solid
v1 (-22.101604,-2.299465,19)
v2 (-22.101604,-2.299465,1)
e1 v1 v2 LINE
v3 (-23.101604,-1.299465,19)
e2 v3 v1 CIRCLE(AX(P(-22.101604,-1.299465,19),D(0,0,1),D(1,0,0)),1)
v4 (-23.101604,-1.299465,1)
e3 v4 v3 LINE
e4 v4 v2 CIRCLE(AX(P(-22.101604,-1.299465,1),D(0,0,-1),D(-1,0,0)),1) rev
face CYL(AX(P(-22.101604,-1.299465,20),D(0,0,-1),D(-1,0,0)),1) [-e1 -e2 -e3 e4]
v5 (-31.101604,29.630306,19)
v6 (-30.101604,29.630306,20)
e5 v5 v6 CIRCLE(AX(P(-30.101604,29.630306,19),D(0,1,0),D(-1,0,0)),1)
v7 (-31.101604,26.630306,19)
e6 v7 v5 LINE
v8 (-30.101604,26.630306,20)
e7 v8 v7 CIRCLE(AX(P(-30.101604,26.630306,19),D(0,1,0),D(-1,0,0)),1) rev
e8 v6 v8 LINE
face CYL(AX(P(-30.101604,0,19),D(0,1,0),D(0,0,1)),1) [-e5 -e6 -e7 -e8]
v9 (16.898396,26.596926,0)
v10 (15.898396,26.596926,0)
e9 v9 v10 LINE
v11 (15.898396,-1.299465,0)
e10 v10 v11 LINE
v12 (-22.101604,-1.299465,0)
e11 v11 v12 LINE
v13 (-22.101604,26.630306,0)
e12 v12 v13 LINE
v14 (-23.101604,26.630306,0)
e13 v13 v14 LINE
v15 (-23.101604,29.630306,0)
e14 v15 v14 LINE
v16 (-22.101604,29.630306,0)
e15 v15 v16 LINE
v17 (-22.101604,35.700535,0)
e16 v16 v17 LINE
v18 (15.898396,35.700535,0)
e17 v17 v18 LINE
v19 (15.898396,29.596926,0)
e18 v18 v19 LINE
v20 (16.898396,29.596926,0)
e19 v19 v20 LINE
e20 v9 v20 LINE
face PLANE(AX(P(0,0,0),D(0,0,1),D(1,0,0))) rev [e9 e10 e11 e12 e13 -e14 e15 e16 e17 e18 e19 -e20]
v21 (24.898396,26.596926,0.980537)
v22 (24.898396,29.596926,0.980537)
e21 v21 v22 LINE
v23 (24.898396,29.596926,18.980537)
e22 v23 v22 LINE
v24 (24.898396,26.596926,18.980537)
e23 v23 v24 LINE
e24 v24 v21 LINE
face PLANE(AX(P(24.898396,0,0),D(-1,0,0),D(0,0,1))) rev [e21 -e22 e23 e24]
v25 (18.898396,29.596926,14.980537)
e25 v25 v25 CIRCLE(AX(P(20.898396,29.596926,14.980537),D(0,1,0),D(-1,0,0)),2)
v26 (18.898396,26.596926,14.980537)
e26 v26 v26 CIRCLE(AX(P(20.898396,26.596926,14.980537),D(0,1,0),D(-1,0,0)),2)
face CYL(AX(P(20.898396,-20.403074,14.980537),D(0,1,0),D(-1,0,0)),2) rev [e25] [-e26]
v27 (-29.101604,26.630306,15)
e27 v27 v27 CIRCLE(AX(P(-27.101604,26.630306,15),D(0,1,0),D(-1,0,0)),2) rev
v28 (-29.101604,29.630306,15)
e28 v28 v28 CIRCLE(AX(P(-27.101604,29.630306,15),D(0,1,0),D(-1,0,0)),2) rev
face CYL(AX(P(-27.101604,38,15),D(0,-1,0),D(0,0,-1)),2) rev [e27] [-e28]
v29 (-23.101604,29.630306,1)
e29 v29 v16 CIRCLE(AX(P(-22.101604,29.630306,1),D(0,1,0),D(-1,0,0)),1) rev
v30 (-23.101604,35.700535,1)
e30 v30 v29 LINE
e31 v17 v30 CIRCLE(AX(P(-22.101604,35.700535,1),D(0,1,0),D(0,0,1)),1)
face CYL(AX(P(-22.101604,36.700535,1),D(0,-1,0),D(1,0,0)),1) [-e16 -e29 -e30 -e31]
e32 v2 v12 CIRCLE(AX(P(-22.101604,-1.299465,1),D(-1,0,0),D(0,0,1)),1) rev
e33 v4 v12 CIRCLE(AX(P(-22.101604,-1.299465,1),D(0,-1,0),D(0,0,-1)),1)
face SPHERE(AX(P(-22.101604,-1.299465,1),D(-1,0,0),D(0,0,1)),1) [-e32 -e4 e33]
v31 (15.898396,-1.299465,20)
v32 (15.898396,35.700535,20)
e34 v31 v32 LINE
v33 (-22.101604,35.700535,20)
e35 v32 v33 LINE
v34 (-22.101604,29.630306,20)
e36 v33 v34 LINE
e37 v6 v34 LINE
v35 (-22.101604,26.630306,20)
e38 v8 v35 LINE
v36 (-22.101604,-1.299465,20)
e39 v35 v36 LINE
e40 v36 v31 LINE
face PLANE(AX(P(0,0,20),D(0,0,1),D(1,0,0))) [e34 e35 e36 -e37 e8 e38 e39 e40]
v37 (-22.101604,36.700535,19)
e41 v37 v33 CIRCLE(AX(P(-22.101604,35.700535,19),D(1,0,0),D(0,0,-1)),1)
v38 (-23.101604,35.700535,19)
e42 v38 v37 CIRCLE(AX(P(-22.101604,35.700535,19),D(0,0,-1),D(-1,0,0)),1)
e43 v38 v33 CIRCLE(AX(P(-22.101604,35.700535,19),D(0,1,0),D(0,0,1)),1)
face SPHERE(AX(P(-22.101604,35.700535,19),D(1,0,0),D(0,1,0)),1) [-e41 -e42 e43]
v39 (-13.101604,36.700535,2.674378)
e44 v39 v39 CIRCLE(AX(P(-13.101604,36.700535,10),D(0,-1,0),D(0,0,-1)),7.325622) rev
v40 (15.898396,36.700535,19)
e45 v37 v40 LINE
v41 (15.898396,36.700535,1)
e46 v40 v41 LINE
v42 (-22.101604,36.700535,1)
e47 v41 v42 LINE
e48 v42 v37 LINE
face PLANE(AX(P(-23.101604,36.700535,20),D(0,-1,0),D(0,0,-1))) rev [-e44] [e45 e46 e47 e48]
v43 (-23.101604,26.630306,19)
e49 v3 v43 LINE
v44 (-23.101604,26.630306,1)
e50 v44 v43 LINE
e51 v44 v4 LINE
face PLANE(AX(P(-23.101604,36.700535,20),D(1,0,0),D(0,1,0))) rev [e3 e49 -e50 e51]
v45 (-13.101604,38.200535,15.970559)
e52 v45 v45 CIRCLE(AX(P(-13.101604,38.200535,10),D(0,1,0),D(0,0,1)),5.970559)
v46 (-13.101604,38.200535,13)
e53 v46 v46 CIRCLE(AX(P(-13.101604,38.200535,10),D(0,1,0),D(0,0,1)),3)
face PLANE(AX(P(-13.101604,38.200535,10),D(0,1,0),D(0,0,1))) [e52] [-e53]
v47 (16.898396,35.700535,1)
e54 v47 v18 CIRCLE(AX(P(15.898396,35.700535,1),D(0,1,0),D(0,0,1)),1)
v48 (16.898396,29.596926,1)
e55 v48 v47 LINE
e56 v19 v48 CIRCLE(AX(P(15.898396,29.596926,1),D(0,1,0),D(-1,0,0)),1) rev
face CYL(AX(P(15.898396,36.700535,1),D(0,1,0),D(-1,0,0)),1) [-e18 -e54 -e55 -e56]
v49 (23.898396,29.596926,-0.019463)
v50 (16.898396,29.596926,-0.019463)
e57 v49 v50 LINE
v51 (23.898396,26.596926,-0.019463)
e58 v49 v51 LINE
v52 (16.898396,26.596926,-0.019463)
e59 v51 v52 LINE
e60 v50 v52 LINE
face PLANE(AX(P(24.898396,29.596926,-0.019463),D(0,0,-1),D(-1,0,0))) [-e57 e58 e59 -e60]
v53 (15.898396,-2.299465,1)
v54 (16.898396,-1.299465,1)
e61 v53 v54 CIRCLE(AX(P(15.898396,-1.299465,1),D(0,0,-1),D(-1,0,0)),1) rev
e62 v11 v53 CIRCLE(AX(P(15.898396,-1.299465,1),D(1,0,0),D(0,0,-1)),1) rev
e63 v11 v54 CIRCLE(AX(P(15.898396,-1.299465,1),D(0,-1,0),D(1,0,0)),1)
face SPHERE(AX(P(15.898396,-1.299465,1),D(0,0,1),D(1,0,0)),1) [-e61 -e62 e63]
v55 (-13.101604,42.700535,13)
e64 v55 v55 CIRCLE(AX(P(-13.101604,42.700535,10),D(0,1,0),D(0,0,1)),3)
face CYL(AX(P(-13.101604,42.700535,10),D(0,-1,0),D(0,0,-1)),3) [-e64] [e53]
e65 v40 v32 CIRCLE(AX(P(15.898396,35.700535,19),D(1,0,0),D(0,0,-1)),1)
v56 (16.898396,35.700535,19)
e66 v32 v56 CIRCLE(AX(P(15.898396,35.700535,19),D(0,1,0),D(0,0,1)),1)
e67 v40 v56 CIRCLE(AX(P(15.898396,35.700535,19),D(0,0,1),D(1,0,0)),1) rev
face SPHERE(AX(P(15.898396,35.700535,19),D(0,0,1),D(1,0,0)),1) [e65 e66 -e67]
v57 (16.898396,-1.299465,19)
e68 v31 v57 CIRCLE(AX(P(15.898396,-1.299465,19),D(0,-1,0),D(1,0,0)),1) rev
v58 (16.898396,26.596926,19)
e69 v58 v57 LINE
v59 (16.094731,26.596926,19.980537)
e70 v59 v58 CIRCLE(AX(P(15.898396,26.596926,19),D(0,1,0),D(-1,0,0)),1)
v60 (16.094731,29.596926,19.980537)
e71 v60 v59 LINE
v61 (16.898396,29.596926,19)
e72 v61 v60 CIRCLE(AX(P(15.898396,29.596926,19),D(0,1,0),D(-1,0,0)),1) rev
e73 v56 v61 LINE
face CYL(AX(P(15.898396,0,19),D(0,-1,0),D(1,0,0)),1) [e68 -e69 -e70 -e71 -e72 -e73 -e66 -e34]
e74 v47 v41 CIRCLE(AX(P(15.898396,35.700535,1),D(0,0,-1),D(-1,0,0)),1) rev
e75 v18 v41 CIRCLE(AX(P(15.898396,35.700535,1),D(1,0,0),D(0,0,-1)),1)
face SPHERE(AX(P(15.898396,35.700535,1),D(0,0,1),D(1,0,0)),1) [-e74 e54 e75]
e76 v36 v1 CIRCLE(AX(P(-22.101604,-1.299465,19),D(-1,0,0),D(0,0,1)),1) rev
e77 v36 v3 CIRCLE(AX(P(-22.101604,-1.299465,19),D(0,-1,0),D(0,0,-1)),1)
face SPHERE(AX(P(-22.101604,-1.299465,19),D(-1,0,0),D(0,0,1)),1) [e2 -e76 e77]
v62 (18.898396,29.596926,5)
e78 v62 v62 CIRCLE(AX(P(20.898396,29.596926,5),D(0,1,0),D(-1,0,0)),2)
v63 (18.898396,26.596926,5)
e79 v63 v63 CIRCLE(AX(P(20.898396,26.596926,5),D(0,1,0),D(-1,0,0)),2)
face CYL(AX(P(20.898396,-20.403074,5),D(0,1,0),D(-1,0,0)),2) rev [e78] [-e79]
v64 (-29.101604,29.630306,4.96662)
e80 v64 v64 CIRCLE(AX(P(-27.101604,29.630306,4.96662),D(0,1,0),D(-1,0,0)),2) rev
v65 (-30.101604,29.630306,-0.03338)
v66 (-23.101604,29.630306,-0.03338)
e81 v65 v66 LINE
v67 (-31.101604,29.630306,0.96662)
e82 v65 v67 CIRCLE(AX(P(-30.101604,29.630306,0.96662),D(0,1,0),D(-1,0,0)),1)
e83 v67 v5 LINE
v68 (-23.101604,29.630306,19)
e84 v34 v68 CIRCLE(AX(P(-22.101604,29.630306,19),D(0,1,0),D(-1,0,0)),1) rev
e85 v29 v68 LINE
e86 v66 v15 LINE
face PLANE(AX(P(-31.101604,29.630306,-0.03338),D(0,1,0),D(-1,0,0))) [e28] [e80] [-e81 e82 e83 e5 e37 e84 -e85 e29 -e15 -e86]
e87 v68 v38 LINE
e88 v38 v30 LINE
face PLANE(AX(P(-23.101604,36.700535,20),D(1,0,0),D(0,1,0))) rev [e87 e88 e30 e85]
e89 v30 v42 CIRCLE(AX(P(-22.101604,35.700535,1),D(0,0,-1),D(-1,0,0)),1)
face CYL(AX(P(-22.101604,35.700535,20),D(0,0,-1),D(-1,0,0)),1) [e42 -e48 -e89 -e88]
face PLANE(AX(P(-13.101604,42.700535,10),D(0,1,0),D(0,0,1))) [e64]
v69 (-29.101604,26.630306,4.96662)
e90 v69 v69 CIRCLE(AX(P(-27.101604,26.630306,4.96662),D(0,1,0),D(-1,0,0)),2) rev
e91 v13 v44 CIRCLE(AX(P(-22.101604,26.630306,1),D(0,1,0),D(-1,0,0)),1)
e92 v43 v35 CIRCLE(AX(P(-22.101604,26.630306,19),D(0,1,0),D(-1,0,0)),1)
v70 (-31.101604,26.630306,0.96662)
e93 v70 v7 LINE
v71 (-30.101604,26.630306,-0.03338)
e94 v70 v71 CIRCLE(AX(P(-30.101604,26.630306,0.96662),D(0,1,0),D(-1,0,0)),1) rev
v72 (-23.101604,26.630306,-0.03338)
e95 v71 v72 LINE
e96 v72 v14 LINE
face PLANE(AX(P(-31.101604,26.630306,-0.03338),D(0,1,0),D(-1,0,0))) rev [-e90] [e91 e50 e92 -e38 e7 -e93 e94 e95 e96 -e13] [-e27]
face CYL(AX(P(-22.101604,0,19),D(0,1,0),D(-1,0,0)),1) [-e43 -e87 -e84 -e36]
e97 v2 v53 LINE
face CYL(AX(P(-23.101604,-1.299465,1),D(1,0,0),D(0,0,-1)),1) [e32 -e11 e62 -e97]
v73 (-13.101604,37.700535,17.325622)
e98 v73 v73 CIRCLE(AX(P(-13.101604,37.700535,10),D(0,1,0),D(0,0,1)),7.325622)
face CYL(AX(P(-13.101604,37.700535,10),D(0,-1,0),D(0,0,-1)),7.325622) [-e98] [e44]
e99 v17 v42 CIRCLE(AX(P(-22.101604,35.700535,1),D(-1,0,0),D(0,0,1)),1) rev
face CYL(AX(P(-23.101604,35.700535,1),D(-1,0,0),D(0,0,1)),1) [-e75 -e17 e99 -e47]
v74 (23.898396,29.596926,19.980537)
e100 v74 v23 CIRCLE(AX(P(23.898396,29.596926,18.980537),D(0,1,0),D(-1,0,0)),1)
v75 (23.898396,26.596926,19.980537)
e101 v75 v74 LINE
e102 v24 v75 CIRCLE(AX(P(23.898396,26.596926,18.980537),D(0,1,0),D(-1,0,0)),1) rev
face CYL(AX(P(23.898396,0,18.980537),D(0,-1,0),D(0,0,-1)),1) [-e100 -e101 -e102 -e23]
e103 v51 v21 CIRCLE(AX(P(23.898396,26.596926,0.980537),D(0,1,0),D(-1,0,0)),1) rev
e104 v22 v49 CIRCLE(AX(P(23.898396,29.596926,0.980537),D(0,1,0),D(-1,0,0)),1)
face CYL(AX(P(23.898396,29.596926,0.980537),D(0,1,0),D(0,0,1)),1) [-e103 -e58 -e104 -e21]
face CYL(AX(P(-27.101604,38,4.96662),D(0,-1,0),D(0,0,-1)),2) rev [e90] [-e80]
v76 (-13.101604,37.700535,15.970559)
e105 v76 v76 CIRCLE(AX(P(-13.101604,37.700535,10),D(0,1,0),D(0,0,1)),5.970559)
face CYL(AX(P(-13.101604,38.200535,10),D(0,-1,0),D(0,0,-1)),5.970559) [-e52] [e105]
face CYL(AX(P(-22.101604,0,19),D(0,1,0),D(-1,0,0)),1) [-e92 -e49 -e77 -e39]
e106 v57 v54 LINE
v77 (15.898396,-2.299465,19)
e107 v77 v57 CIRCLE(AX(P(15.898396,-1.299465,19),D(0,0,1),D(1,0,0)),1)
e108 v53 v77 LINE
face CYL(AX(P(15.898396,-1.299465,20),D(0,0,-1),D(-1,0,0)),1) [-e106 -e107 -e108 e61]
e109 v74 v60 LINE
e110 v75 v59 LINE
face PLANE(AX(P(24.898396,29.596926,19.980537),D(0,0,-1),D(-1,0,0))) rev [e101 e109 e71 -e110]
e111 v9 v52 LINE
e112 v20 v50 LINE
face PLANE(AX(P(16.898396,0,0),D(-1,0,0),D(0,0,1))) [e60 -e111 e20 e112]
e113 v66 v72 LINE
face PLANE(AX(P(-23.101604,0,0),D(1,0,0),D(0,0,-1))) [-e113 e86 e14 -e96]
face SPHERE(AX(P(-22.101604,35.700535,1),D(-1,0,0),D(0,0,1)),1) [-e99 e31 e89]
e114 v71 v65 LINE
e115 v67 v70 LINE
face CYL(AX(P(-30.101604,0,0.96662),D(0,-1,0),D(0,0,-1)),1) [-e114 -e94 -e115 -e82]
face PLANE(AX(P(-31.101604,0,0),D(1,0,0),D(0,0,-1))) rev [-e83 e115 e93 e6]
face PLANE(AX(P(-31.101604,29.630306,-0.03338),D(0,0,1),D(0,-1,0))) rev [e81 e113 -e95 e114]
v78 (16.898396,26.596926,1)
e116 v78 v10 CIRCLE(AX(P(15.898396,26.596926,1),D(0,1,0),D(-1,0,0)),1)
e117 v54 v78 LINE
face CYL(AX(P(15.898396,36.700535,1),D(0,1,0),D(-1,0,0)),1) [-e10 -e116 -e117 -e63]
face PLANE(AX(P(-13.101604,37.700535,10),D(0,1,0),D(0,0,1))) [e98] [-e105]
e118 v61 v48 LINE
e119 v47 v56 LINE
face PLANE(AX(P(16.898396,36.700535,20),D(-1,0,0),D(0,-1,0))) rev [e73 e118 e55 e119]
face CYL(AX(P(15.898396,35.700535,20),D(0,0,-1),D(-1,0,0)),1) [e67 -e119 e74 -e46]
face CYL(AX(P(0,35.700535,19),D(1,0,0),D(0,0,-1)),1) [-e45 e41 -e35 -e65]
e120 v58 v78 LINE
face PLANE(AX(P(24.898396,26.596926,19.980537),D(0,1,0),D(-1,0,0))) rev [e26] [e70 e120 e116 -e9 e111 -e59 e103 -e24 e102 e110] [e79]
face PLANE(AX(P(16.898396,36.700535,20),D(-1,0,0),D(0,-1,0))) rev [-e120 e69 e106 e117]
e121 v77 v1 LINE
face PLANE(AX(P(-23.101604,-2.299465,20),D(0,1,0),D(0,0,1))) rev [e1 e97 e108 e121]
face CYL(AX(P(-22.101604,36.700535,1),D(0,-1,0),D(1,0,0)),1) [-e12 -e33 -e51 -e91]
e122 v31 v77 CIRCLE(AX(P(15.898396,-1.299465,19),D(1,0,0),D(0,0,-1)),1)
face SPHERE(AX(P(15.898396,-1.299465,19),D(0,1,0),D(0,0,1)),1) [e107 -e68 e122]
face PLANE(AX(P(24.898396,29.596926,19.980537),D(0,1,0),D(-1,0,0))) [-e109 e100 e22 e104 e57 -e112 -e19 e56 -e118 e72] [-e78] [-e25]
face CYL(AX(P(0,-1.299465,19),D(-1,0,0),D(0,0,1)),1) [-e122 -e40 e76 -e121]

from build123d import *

# Parameters (mm, degrees)
SKETCH_1_W               = 40
SKETCH_1_H               = 39
EXTRUDE_1_DEPTH          = 20
SKETCH_3_W               = 20
SKETCH_3_H               = 3
EXTRUDE_2_DEPTH          = 8
SKETCH_6_W               = 20.033379722
SKETCH_6_H               = 3
EXTRUDE_4_DEPTH          = 8
CUT_EXTRUDE_1_DEPTH      = 38
CUT_EXTRUDE_1_DEPTH_BACK = 50
SKETCH_7_R               = 2
SKETCH_8_R               = 2
CUT_EXTRUDE_2_DEPTH      = 50
SKETCH_9_R               = 3
EXTRUDE_7_DEPTH          = 6
SKETCH_11_R              = 5.970559472
EXTRUDE_8_DEPTH          = 1.5
SKETCH_12_R              = 7.325621725
EXTRUDE_9_DEPTH          = 1
FILLET_3_R               = 1
FILLET_4_R               = 1
FILLET_5_R               = 1
FILLET_8_R               = 1
FILLET_9_R               = 1


with BuildPart() as part:
    # 草图1 → 凸台-拉伸1 (new body)
    with BuildSketch(Plane.XY):
        with Locations((-3.101604278, 17.200534759)):
            Rectangle(SKETCH_1_W, SKETCH_1_H)
    extrude(amount=EXTRUDE_1_DEPTH)

    # 草图3 → 凸台-拉伸2 (add)
    with BuildSketch(Plane(origin=(16.898395722, 0, 0), x_dir=(0, 0, -1), z_dir=(1, 0, 0))):
        with Locations((-9.980536854, 28.09692648)):
            Rectangle(SKETCH_3_W, SKETCH_3_H)
    extrude(amount=EXTRUDE_2_DEPTH)

    # 草图6 → 凸台-拉伸4 (add)
    with BuildSketch(Plane.ZY.offset(23.101604278)):
        with Locations((9.983310139, 28.130306202)):
            Rectangle(SKETCH_6_W, SKETCH_6_H)
    extrude(amount=EXTRUDE_4_DEPTH)

    # 草图7 → 切除-拉伸1 (cut, two sides: drawn at the far end of the back side and taken through both)
    with BuildSketch(Plane(origin=(0, 0, 0), x_dir=(1, 0, 0), z_dir=(0, 1, 0)).offset(-CUT_EXTRUDE_1_DEPTH_BACK)):
        with Locations(Location((-27.101604278, -15, 0), (0, 0, 180))):
            Circle(SKETCH_7_R)
        with Locations(Location((-27.101604278, -4.966620278, 0), (0, 0, 180))):
            Circle(SKETCH_7_R)
    extrude(amount=CUT_EXTRUDE_1_DEPTH + CUT_EXTRUDE_1_DEPTH_BACK, mode=Mode.SUBTRACT)

    # 草图8 → 切除-拉伸2 (cut)
    with BuildSketch(Plane(origin=(0, 29.59692648, 0), x_dir=(1, 0, 0), z_dir=(0, 1, 0))):
        with Locations(Location((20.898395722, -5, 0), (0, 0, 180))):
            Circle(SKETCH_8_R)
        with Locations(Location((20.898395722, -14.980536854, 0), (0, 0, 180))):
            Circle(SKETCH_8_R)
    extrude(amount=-CUT_EXTRUDE_2_DEPTH, mode=Mode.SUBTRACT)

    # 草图9 → 凸台-拉伸7 (add)
    with BuildSketch(Plane(origin=(0, 36.700534759, 0), x_dir=(1, 0, 0), z_dir=(0, 1, 0))):
        with Locations(Location((-13.101604278, -10, 0), (0, 0, 90))):
            Circle(SKETCH_9_R)
    extrude(amount=EXTRUDE_7_DEPTH)

    # 草图11 → 凸台-拉伸8 (add)
    with BuildSketch(Plane(origin=(0, 36.700534759, 0), x_dir=(1, 0, 0), z_dir=(0, 1, 0))):
        with Locations(Location((-13.101604278, -10, 0), (0, 0, 90))):
            Circle(SKETCH_11_R)
    extrude(amount=EXTRUDE_8_DEPTH)

    # 草图12 → 凸台-拉伸9 (add)
    with BuildSketch(Plane(origin=(0, 36.700534759, 0), x_dir=(1, 0, 0), z_dir=(0, 1, 0))):
        with Locations(Location((-13.101604278, -10, 0), (0, 0, 90))):
            Circle(SKETCH_12_R)
    extrude(amount=EXTRUDE_9_DEPTH)

    # 圆角3
    # the kernel refuses this fillet: 1 mm, written as the material it takes off along each edge
    with BuildSketch(Plane(origin=(15.898395722, 35.700534759, 19), x_dir=(0, 0, 1), z_dir=(0, 1, 0))) as fillet_3_piece_1_section:
        Polygon((0, 0), (FILLET_3_R, 0), (FILLET_3_R, FILLET_3_R), (0, FILLET_3_R), align=None)
    fillet_3_piece_1 = extrude(amount=FILLET_3_R, mode=Mode.PRIVATE)
    fillet_3_piece_1 = fillet_3_piece_1 - Plane(origin=(15.898395722, 35.700534759, 19), x_dir=(-0.7071067811865475, 0, -0.7071067811865475), z_dir=(0, 1, 0)) * Sphere(FILLET_3_R, mode=Mode.PRIVATE)
    add(fillet_3_piece_1, mode=Mode.SUBTRACT)
    with BuildSketch(Plane(origin=(16.898395722, 36.700534759, -2.5), x_dir=(-1, 0, 0), z_dir=(0, 0, 1))) as fillet_3_piece_2:
        with BuildLine():
            CenterArc((FILLET_3_R, FILLET_3_R), FILLET_3_R, 180, 90)
            Line((0, FILLET_3_R), (0, 0))
            Line((0, 0), (FILLET_3_R, 0))
        make_face()
    extrude(amount=21.5, mode=Mode.SUBTRACT)
    with BuildSketch(Plane(origin=(16.898395722, 35.700534759, 20), x_dir=(-1, 0, 0), z_dir=(0, -1, 0))) as fillet_3_piece_3_section:
        with BuildLine():
            CenterArc((FILLET_3_R, FILLET_3_R), FILLET_3_R, 180, 90)
            Line((0, FILLET_3_R), (0, 0))
            Line((0, 0), (FILLET_3_R, 0))
        make_face()
    fillet_3_piece_3 = extrude(amount=40.5, mode=Mode.PRIVATE)
    fillet_3_piece_3 = split(fillet_3_piece_3, bisect_by=Plane(origin=(16.437934638, 29.59692648, 20.00107683), z_dir=(0, 1, 0)), keep=Keep.TOP, mode=Mode.PRIVATE)
    fillet_3_piece_3 = split(fillet_3_piece_3, bisect_by=Plane(origin=(16.437934638, 32.648730619, 19.980536854), z_dir=(0, 0, 1)), keep=Keep.TOP, mode=Mode.PRIVATE)
    add(fillet_3_piece_3, mode=Mode.SUBTRACT)
    with BuildSketch(Plane(origin=(16.898395722, 35.700534759, 20), x_dir=(-1, 0, 0), z_dir=(0, -1, 0))) as fillet_3_piece_4_section:
        with BuildLine():
            CenterArc((FILLET_3_R, FILLET_3_R), FILLET_3_R, 180, 90)
            Line((0, FILLET_3_R), (0, 0))
            Line((0, 0), (FILLET_3_R, 0))
        make_face()
    fillet_3_piece_4 = extrude(amount=40.5, mode=Mode.PRIVATE)
    fillet_3_piece_4 = split(fillet_3_piece_4, bisect_by=Plane(origin=(16.712608884, 29.59692648, 19.734140611), z_dir=(0, 1, 0)), keep=Keep.TOP, mode=Mode.PRIVATE)
    fillet_3_piece_4 = split(fillet_3_piece_4, bisect_by=Plane(origin=(16.712608884, 32.648730619, 19.980536854), z_dir=(0, 0, -1)), keep=Keep.TOP, mode=Mode.PRIVATE)
    add(fillet_3_piece_4, mode=Mode.SUBTRACT)
    with BuildSketch(Plane(origin=(16.898395722, 35.700534759, 20), x_dir=(-1, 0, 0), z_dir=(0, -1, 0))) as fillet_3_piece_5_section:
        with BuildLine():
            CenterArc((FILLET_3_R, FILLET_3_R), FILLET_3_R, 180, 90)
            Line((0, FILLET_3_R), (0, 0))
            Line((0, 0), (FILLET_3_R, 0))
        make_face()
    fillet_3_piece_5 = extrude(amount=40.5, mode=Mode.PRIVATE)
    fillet_3_piece_5 = split(fillet_3_piece_5, bisect_by=Plane(origin=(16.437934638, 29.59692648, 20.00107683), z_dir=(0, -1, 0)), keep=Keep.TOP, mode=Mode.PRIVATE)
    fillet_3_piece_5 = split(fillet_3_piece_5, bisect_by=Plane(origin=(16.437934638, 28.09692648, 19.980536854), z_dir=(0, 0, 1)), keep=Keep.TOP, mode=Mode.PRIVATE)
    fillet_3_piece_5 = split(fillet_3_piece_5, bisect_by=Plane(origin=(16.437934638, 26.59692648, 20.00107683), z_dir=(0, 1, 0)), keep=Keep.TOP, mode=Mode.PRIVATE)
    add(fillet_3_piece_5, mode=Mode.SUBTRACT)
    with BuildSketch(Plane(origin=(16.898395722, 35.700534759, 20), x_dir=(-1, 0, 0), z_dir=(0, -1, 0))) as fillet_3_piece_6_section:
        with BuildLine():
            CenterArc((FILLET_3_R, FILLET_3_R), FILLET_3_R, 180, 90)
            Line((0, FILLET_3_R), (0, 0))
            Line((0, 0), (FILLET_3_R, 0))
        make_face()
    fillet_3_piece_6 = extrude(amount=40.5, mode=Mode.PRIVATE)
    fillet_3_piece_6 = split(fillet_3_piece_6, bisect_by=Plane(origin=(16.437934638, 10.898730619, 19.980536854), z_dir=(0, 0, 1)), keep=Keep.TOP, mode=Mode.PRIVATE)
    fillet_3_piece_6 = split(fillet_3_piece_6, bisect_by=Plane(origin=(16.437934638, 26.59692648, 20.00107683), z_dir=(0, -1, 0)), keep=Keep.TOP, mode=Mode.PRIVATE)
    add(fillet_3_piece_6, mode=Mode.SUBTRACT)
    with BuildSketch(Plane(origin=(16.898395722, 35.700534759, 20), x_dir=(-1, 0, 0), z_dir=(0, -1, 0))) as fillet_3_piece_7_section:
        with BuildLine():
            CenterArc((FILLET_3_R, FILLET_3_R), FILLET_3_R, 180, 90)
            Line((0, FILLET_3_R), (0, 0))
            Line((0, 0), (FILLET_3_R, 0))
        make_face()
    fillet_3_piece_7 = extrude(amount=40.5, mode=Mode.PRIVATE)
    fillet_3_piece_7 = split(fillet_3_piece_7, bisect_by=Plane(origin=(16.712608884, 10.898730619, 19.980536854), z_dir=(0, 0, -1)), keep=Keep.TOP, mode=Mode.PRIVATE)
    fillet_3_piece_7 = split(fillet_3_piece_7, bisect_by=Plane(origin=(16.712608884, 26.59692648, 19.734140611), z_dir=(0, -1, 0)), keep=Keep.TOP, mode=Mode.PRIVATE)
    add(fillet_3_piece_7, mode=Mode.SUBTRACT)
    with BuildSketch(Plane(origin=(-25.601604278, 36.700534759, 20), x_dir=(0, 0, -1), z_dir=(1, 0, 0))) as fillet_3_piece_8:
        with BuildLine():
            CenterArc((FILLET_3_R, -FILLET_3_R), FILLET_3_R, 90, 90)
            Line((0, -FILLET_3_R), (0, 0))
            Line((0, 0), (FILLET_3_R, 0))
        make_face()
    extrude(amount=41.5, mode=Mode.SUBTRACT)

    # 圆角4
    fillet_4_edges = [part.edges().sort_by_distance(p)[0] for p in [
        (-23.101604278, 12.16542048, 0),
        (-23.101604278, 12.16542048, 20),
        (-3.101604278, -2.299465241, 0),
        (-23.101604278, -2.299465241, 10),
        (-3.601604278, -2.299465241, 20),
        (16.898395722, -2.299465241, 9.5),
        (16.605502503, -2.299465241, 19.707106781),
    ]]
    fillet(fillet_4_edges, radius=FILLET_4_R)

    # 圆角5
    # the kernel refuses this fillet: 1 mm, written as the material it takes off along each edge
    with BuildSketch(Plane(origin=(15.898395722, -1.299465241, 1), x_dir=(1, 0, 0), z_dir=(0, 0, -1))) as fillet_5_piece_1_section:
        Polygon((0, 0), (FILLET_5_R * 1.02, 0), (FILLET_5_R * 1.02, FILLET_5_R * 1.02), (0, FILLET_5_R * 1.02), align=None)
    fillet_5_piece_1 = extrude(amount=FILLET_5_R * 1.02, mode=Mode.PRIVATE)
    fillet_5_piece_1 = fillet_5_piece_1 - Plane(origin=(15.898395722, -1.299465241, 1), x_dir=(-0.7071067811865476, 0.7071067811865475, 0), z_dir=(0, 0, -1)) * Sphere(FILLET_5_R, mode=Mode.PRIVATE)
    add(fillet_5_piece_1, mode=Mode.SUBTRACT)
    with BuildSketch(Plane(origin=(-22.101604278, 35.700534759, 1), x_dir=(-1, 0, 0), z_dir=(0, 0, -1))) as fillet_5_piece_2_section:
        Polygon((0, 0), (FILLET_5_R * 1.02, 0), (FILLET_5_R * 1.02, FILLET_5_R * 1.02), (0, FILLET_5_R * 1.02), align=None)
    fillet_5_piece_2 = extrude(amount=FILLET_5_R * 1.02, mode=Mode.PRIVATE)
    fillet_5_piece_2 = fillet_5_piece_2 - Plane(origin=(-22.101604278, 35.700534759, 1), x_dir=(0.7071067811865476, -0.7071067811865475, 0), z_dir=(0, 0, -1)) * Sphere(FILLET_5_R, mode=Mode.PRIVATE)
    add(fillet_5_piece_2, mode=Mode.SUBTRACT)
    with BuildSketch(Plane(origin=(16.898395722, 26.59692648, 0), x_dir=(-1, 0, 0), z_dir=(0, -1, 0))) as fillet_5_piece_3:
        with BuildLine():
            CenterArc((FILLET_5_R, -FILLET_5_R), FILLET_5_R, 90, 90)
            Line((0, -FILLET_5_R), (0, 0))
            Line((0, 0), (FILLET_5_R, 0))
        make_face()
    extrude(amount=27.89639172, mode=Mode.SUBTRACT)
    with BuildSketch(Plane(origin=(16.898395722, 35.700534759, 0), x_dir=(-1, 0, 0), z_dir=(0, -1, 0))) as fillet_5_piece_4:
        with BuildLine():
            CenterArc((FILLET_5_R, -FILLET_5_R), FILLET_5_R, 90, 90)
            Line((0, -FILLET_5_R), (0, 0))
            Line((0, 0), (FILLET_5_R, 0))
        make_face()
    extrude(amount=6.10360828, mode=Mode.SUBTRACT)
    with BuildSketch(Plane(origin=(-23.101604278, 29.630306202, 0), x_dir=(1, 0, 0), z_dir=(0, 1, 0)), Plane(origin=(-23.101604278, 29.630306202, 20), x_dir=(0, 0, -1), z_dir=(0, 1, 0))) as fillet_5_piece_5:
        with BuildLine():
            CenterArc((FILLET_5_R, -FILLET_5_R), FILLET_5_R, 90, 90)
            Line((0, -FILLET_5_R), (0, 0))
            Line((0, 0), (FILLET_5_R, 0))
        make_face()
    extrude(amount=6.070228558, mode=Mode.SUBTRACT)
    with BuildSketch(Plane(origin=(-22.101604278, 36.700534759, 0), x_dir=(0, -1, 0), z_dir=(1, 0, 0))) as fillet_5_piece_6:
        with BuildLine():
            CenterArc((FILLET_5_R, -FILLET_5_R), FILLET_5_R, 90, 90)
            Line((0, -FILLET_5_R), (0, 0))
            Line((0, 0), (FILLET_5_R, 0))
        make_face()
    extrude(amount=38, mode=Mode.SUBTRACT)
    with BuildSketch(Plane(origin=(-23.101604278, 36.700534759, 1), x_dir=(0, -1, 0), z_dir=(0, 0, 1))) as fillet_5_piece_7:
        with BuildLine():
            CenterArc((FILLET_5_R, FILLET_5_R), FILLET_5_R, 180, 90)
            Line((0, FILLET_5_R), (0, 0))
            Line((0, 0), (FILLET_5_R, 0))
        make_face()
    extrude(amount=18, mode=Mode.SUBTRACT)
    with BuildSketch(Plane(origin=(15.898395722, 35.700534759, 0), x_dir=(0, 1, 0), z_dir=(-1, 0, 0))) as fillet_5_piece_8:
        with BuildLine():
            CenterArc((1 - FILLET_5_R, -FILLET_5_R), FILLET_5_R, 0, 90)
            Line((1, -FILLET_5_R), (1, 0))
            Line((1, 0), (1 - FILLET_5_R, 0))
        make_face()
    revolve(axis=Axis((15.898395722, 35.700534759, 0), (0, 0, -1)), revolution_arc=90, mode=Mode.SUBTRACT)
    with BuildSketch(Plane(origin=(-23.101604278, 35.700534759, 19), x_dir=(0, 0, 1), z_dir=(0, -1, 0))) as fillet_5_piece_9:
        with BuildLine():
            CenterArc((1 - FILLET_5_R, -FILLET_5_R), FILLET_5_R, 0, 90)
            Line((1, -FILLET_5_R), (1, 0))
            Line((1, 0), (1 - FILLET_5_R, 0))
        make_face()
    revolve(axis=Axis((-23.101604278, 35.700534759, 19), (-1, 0, 0)), revolution_arc=90, mode=Mode.SUBTRACT)

    # 圆角8
    fillet_8_edges = [part.edges().sort_by_distance(p)[0] for p in [
        (24.898395722, 28.09692648, -0.019463146),
        (24.898395722, 28.09692648, 19.980536854),
    ]]
    fillet(fillet_8_edges, radius=FILLET_8_R)

    # 圆角9
    fillet_9_edges = [part.edges().sort_by_distance(p)[0] for p in [
        (-31.101604278, 28.130306202, 20),
        (-31.101604278, 28.130306202, -0.033379722),
    ]]
    fillet(fillet_9_edges, radius=FILLET_9_R)


solid = part.part
